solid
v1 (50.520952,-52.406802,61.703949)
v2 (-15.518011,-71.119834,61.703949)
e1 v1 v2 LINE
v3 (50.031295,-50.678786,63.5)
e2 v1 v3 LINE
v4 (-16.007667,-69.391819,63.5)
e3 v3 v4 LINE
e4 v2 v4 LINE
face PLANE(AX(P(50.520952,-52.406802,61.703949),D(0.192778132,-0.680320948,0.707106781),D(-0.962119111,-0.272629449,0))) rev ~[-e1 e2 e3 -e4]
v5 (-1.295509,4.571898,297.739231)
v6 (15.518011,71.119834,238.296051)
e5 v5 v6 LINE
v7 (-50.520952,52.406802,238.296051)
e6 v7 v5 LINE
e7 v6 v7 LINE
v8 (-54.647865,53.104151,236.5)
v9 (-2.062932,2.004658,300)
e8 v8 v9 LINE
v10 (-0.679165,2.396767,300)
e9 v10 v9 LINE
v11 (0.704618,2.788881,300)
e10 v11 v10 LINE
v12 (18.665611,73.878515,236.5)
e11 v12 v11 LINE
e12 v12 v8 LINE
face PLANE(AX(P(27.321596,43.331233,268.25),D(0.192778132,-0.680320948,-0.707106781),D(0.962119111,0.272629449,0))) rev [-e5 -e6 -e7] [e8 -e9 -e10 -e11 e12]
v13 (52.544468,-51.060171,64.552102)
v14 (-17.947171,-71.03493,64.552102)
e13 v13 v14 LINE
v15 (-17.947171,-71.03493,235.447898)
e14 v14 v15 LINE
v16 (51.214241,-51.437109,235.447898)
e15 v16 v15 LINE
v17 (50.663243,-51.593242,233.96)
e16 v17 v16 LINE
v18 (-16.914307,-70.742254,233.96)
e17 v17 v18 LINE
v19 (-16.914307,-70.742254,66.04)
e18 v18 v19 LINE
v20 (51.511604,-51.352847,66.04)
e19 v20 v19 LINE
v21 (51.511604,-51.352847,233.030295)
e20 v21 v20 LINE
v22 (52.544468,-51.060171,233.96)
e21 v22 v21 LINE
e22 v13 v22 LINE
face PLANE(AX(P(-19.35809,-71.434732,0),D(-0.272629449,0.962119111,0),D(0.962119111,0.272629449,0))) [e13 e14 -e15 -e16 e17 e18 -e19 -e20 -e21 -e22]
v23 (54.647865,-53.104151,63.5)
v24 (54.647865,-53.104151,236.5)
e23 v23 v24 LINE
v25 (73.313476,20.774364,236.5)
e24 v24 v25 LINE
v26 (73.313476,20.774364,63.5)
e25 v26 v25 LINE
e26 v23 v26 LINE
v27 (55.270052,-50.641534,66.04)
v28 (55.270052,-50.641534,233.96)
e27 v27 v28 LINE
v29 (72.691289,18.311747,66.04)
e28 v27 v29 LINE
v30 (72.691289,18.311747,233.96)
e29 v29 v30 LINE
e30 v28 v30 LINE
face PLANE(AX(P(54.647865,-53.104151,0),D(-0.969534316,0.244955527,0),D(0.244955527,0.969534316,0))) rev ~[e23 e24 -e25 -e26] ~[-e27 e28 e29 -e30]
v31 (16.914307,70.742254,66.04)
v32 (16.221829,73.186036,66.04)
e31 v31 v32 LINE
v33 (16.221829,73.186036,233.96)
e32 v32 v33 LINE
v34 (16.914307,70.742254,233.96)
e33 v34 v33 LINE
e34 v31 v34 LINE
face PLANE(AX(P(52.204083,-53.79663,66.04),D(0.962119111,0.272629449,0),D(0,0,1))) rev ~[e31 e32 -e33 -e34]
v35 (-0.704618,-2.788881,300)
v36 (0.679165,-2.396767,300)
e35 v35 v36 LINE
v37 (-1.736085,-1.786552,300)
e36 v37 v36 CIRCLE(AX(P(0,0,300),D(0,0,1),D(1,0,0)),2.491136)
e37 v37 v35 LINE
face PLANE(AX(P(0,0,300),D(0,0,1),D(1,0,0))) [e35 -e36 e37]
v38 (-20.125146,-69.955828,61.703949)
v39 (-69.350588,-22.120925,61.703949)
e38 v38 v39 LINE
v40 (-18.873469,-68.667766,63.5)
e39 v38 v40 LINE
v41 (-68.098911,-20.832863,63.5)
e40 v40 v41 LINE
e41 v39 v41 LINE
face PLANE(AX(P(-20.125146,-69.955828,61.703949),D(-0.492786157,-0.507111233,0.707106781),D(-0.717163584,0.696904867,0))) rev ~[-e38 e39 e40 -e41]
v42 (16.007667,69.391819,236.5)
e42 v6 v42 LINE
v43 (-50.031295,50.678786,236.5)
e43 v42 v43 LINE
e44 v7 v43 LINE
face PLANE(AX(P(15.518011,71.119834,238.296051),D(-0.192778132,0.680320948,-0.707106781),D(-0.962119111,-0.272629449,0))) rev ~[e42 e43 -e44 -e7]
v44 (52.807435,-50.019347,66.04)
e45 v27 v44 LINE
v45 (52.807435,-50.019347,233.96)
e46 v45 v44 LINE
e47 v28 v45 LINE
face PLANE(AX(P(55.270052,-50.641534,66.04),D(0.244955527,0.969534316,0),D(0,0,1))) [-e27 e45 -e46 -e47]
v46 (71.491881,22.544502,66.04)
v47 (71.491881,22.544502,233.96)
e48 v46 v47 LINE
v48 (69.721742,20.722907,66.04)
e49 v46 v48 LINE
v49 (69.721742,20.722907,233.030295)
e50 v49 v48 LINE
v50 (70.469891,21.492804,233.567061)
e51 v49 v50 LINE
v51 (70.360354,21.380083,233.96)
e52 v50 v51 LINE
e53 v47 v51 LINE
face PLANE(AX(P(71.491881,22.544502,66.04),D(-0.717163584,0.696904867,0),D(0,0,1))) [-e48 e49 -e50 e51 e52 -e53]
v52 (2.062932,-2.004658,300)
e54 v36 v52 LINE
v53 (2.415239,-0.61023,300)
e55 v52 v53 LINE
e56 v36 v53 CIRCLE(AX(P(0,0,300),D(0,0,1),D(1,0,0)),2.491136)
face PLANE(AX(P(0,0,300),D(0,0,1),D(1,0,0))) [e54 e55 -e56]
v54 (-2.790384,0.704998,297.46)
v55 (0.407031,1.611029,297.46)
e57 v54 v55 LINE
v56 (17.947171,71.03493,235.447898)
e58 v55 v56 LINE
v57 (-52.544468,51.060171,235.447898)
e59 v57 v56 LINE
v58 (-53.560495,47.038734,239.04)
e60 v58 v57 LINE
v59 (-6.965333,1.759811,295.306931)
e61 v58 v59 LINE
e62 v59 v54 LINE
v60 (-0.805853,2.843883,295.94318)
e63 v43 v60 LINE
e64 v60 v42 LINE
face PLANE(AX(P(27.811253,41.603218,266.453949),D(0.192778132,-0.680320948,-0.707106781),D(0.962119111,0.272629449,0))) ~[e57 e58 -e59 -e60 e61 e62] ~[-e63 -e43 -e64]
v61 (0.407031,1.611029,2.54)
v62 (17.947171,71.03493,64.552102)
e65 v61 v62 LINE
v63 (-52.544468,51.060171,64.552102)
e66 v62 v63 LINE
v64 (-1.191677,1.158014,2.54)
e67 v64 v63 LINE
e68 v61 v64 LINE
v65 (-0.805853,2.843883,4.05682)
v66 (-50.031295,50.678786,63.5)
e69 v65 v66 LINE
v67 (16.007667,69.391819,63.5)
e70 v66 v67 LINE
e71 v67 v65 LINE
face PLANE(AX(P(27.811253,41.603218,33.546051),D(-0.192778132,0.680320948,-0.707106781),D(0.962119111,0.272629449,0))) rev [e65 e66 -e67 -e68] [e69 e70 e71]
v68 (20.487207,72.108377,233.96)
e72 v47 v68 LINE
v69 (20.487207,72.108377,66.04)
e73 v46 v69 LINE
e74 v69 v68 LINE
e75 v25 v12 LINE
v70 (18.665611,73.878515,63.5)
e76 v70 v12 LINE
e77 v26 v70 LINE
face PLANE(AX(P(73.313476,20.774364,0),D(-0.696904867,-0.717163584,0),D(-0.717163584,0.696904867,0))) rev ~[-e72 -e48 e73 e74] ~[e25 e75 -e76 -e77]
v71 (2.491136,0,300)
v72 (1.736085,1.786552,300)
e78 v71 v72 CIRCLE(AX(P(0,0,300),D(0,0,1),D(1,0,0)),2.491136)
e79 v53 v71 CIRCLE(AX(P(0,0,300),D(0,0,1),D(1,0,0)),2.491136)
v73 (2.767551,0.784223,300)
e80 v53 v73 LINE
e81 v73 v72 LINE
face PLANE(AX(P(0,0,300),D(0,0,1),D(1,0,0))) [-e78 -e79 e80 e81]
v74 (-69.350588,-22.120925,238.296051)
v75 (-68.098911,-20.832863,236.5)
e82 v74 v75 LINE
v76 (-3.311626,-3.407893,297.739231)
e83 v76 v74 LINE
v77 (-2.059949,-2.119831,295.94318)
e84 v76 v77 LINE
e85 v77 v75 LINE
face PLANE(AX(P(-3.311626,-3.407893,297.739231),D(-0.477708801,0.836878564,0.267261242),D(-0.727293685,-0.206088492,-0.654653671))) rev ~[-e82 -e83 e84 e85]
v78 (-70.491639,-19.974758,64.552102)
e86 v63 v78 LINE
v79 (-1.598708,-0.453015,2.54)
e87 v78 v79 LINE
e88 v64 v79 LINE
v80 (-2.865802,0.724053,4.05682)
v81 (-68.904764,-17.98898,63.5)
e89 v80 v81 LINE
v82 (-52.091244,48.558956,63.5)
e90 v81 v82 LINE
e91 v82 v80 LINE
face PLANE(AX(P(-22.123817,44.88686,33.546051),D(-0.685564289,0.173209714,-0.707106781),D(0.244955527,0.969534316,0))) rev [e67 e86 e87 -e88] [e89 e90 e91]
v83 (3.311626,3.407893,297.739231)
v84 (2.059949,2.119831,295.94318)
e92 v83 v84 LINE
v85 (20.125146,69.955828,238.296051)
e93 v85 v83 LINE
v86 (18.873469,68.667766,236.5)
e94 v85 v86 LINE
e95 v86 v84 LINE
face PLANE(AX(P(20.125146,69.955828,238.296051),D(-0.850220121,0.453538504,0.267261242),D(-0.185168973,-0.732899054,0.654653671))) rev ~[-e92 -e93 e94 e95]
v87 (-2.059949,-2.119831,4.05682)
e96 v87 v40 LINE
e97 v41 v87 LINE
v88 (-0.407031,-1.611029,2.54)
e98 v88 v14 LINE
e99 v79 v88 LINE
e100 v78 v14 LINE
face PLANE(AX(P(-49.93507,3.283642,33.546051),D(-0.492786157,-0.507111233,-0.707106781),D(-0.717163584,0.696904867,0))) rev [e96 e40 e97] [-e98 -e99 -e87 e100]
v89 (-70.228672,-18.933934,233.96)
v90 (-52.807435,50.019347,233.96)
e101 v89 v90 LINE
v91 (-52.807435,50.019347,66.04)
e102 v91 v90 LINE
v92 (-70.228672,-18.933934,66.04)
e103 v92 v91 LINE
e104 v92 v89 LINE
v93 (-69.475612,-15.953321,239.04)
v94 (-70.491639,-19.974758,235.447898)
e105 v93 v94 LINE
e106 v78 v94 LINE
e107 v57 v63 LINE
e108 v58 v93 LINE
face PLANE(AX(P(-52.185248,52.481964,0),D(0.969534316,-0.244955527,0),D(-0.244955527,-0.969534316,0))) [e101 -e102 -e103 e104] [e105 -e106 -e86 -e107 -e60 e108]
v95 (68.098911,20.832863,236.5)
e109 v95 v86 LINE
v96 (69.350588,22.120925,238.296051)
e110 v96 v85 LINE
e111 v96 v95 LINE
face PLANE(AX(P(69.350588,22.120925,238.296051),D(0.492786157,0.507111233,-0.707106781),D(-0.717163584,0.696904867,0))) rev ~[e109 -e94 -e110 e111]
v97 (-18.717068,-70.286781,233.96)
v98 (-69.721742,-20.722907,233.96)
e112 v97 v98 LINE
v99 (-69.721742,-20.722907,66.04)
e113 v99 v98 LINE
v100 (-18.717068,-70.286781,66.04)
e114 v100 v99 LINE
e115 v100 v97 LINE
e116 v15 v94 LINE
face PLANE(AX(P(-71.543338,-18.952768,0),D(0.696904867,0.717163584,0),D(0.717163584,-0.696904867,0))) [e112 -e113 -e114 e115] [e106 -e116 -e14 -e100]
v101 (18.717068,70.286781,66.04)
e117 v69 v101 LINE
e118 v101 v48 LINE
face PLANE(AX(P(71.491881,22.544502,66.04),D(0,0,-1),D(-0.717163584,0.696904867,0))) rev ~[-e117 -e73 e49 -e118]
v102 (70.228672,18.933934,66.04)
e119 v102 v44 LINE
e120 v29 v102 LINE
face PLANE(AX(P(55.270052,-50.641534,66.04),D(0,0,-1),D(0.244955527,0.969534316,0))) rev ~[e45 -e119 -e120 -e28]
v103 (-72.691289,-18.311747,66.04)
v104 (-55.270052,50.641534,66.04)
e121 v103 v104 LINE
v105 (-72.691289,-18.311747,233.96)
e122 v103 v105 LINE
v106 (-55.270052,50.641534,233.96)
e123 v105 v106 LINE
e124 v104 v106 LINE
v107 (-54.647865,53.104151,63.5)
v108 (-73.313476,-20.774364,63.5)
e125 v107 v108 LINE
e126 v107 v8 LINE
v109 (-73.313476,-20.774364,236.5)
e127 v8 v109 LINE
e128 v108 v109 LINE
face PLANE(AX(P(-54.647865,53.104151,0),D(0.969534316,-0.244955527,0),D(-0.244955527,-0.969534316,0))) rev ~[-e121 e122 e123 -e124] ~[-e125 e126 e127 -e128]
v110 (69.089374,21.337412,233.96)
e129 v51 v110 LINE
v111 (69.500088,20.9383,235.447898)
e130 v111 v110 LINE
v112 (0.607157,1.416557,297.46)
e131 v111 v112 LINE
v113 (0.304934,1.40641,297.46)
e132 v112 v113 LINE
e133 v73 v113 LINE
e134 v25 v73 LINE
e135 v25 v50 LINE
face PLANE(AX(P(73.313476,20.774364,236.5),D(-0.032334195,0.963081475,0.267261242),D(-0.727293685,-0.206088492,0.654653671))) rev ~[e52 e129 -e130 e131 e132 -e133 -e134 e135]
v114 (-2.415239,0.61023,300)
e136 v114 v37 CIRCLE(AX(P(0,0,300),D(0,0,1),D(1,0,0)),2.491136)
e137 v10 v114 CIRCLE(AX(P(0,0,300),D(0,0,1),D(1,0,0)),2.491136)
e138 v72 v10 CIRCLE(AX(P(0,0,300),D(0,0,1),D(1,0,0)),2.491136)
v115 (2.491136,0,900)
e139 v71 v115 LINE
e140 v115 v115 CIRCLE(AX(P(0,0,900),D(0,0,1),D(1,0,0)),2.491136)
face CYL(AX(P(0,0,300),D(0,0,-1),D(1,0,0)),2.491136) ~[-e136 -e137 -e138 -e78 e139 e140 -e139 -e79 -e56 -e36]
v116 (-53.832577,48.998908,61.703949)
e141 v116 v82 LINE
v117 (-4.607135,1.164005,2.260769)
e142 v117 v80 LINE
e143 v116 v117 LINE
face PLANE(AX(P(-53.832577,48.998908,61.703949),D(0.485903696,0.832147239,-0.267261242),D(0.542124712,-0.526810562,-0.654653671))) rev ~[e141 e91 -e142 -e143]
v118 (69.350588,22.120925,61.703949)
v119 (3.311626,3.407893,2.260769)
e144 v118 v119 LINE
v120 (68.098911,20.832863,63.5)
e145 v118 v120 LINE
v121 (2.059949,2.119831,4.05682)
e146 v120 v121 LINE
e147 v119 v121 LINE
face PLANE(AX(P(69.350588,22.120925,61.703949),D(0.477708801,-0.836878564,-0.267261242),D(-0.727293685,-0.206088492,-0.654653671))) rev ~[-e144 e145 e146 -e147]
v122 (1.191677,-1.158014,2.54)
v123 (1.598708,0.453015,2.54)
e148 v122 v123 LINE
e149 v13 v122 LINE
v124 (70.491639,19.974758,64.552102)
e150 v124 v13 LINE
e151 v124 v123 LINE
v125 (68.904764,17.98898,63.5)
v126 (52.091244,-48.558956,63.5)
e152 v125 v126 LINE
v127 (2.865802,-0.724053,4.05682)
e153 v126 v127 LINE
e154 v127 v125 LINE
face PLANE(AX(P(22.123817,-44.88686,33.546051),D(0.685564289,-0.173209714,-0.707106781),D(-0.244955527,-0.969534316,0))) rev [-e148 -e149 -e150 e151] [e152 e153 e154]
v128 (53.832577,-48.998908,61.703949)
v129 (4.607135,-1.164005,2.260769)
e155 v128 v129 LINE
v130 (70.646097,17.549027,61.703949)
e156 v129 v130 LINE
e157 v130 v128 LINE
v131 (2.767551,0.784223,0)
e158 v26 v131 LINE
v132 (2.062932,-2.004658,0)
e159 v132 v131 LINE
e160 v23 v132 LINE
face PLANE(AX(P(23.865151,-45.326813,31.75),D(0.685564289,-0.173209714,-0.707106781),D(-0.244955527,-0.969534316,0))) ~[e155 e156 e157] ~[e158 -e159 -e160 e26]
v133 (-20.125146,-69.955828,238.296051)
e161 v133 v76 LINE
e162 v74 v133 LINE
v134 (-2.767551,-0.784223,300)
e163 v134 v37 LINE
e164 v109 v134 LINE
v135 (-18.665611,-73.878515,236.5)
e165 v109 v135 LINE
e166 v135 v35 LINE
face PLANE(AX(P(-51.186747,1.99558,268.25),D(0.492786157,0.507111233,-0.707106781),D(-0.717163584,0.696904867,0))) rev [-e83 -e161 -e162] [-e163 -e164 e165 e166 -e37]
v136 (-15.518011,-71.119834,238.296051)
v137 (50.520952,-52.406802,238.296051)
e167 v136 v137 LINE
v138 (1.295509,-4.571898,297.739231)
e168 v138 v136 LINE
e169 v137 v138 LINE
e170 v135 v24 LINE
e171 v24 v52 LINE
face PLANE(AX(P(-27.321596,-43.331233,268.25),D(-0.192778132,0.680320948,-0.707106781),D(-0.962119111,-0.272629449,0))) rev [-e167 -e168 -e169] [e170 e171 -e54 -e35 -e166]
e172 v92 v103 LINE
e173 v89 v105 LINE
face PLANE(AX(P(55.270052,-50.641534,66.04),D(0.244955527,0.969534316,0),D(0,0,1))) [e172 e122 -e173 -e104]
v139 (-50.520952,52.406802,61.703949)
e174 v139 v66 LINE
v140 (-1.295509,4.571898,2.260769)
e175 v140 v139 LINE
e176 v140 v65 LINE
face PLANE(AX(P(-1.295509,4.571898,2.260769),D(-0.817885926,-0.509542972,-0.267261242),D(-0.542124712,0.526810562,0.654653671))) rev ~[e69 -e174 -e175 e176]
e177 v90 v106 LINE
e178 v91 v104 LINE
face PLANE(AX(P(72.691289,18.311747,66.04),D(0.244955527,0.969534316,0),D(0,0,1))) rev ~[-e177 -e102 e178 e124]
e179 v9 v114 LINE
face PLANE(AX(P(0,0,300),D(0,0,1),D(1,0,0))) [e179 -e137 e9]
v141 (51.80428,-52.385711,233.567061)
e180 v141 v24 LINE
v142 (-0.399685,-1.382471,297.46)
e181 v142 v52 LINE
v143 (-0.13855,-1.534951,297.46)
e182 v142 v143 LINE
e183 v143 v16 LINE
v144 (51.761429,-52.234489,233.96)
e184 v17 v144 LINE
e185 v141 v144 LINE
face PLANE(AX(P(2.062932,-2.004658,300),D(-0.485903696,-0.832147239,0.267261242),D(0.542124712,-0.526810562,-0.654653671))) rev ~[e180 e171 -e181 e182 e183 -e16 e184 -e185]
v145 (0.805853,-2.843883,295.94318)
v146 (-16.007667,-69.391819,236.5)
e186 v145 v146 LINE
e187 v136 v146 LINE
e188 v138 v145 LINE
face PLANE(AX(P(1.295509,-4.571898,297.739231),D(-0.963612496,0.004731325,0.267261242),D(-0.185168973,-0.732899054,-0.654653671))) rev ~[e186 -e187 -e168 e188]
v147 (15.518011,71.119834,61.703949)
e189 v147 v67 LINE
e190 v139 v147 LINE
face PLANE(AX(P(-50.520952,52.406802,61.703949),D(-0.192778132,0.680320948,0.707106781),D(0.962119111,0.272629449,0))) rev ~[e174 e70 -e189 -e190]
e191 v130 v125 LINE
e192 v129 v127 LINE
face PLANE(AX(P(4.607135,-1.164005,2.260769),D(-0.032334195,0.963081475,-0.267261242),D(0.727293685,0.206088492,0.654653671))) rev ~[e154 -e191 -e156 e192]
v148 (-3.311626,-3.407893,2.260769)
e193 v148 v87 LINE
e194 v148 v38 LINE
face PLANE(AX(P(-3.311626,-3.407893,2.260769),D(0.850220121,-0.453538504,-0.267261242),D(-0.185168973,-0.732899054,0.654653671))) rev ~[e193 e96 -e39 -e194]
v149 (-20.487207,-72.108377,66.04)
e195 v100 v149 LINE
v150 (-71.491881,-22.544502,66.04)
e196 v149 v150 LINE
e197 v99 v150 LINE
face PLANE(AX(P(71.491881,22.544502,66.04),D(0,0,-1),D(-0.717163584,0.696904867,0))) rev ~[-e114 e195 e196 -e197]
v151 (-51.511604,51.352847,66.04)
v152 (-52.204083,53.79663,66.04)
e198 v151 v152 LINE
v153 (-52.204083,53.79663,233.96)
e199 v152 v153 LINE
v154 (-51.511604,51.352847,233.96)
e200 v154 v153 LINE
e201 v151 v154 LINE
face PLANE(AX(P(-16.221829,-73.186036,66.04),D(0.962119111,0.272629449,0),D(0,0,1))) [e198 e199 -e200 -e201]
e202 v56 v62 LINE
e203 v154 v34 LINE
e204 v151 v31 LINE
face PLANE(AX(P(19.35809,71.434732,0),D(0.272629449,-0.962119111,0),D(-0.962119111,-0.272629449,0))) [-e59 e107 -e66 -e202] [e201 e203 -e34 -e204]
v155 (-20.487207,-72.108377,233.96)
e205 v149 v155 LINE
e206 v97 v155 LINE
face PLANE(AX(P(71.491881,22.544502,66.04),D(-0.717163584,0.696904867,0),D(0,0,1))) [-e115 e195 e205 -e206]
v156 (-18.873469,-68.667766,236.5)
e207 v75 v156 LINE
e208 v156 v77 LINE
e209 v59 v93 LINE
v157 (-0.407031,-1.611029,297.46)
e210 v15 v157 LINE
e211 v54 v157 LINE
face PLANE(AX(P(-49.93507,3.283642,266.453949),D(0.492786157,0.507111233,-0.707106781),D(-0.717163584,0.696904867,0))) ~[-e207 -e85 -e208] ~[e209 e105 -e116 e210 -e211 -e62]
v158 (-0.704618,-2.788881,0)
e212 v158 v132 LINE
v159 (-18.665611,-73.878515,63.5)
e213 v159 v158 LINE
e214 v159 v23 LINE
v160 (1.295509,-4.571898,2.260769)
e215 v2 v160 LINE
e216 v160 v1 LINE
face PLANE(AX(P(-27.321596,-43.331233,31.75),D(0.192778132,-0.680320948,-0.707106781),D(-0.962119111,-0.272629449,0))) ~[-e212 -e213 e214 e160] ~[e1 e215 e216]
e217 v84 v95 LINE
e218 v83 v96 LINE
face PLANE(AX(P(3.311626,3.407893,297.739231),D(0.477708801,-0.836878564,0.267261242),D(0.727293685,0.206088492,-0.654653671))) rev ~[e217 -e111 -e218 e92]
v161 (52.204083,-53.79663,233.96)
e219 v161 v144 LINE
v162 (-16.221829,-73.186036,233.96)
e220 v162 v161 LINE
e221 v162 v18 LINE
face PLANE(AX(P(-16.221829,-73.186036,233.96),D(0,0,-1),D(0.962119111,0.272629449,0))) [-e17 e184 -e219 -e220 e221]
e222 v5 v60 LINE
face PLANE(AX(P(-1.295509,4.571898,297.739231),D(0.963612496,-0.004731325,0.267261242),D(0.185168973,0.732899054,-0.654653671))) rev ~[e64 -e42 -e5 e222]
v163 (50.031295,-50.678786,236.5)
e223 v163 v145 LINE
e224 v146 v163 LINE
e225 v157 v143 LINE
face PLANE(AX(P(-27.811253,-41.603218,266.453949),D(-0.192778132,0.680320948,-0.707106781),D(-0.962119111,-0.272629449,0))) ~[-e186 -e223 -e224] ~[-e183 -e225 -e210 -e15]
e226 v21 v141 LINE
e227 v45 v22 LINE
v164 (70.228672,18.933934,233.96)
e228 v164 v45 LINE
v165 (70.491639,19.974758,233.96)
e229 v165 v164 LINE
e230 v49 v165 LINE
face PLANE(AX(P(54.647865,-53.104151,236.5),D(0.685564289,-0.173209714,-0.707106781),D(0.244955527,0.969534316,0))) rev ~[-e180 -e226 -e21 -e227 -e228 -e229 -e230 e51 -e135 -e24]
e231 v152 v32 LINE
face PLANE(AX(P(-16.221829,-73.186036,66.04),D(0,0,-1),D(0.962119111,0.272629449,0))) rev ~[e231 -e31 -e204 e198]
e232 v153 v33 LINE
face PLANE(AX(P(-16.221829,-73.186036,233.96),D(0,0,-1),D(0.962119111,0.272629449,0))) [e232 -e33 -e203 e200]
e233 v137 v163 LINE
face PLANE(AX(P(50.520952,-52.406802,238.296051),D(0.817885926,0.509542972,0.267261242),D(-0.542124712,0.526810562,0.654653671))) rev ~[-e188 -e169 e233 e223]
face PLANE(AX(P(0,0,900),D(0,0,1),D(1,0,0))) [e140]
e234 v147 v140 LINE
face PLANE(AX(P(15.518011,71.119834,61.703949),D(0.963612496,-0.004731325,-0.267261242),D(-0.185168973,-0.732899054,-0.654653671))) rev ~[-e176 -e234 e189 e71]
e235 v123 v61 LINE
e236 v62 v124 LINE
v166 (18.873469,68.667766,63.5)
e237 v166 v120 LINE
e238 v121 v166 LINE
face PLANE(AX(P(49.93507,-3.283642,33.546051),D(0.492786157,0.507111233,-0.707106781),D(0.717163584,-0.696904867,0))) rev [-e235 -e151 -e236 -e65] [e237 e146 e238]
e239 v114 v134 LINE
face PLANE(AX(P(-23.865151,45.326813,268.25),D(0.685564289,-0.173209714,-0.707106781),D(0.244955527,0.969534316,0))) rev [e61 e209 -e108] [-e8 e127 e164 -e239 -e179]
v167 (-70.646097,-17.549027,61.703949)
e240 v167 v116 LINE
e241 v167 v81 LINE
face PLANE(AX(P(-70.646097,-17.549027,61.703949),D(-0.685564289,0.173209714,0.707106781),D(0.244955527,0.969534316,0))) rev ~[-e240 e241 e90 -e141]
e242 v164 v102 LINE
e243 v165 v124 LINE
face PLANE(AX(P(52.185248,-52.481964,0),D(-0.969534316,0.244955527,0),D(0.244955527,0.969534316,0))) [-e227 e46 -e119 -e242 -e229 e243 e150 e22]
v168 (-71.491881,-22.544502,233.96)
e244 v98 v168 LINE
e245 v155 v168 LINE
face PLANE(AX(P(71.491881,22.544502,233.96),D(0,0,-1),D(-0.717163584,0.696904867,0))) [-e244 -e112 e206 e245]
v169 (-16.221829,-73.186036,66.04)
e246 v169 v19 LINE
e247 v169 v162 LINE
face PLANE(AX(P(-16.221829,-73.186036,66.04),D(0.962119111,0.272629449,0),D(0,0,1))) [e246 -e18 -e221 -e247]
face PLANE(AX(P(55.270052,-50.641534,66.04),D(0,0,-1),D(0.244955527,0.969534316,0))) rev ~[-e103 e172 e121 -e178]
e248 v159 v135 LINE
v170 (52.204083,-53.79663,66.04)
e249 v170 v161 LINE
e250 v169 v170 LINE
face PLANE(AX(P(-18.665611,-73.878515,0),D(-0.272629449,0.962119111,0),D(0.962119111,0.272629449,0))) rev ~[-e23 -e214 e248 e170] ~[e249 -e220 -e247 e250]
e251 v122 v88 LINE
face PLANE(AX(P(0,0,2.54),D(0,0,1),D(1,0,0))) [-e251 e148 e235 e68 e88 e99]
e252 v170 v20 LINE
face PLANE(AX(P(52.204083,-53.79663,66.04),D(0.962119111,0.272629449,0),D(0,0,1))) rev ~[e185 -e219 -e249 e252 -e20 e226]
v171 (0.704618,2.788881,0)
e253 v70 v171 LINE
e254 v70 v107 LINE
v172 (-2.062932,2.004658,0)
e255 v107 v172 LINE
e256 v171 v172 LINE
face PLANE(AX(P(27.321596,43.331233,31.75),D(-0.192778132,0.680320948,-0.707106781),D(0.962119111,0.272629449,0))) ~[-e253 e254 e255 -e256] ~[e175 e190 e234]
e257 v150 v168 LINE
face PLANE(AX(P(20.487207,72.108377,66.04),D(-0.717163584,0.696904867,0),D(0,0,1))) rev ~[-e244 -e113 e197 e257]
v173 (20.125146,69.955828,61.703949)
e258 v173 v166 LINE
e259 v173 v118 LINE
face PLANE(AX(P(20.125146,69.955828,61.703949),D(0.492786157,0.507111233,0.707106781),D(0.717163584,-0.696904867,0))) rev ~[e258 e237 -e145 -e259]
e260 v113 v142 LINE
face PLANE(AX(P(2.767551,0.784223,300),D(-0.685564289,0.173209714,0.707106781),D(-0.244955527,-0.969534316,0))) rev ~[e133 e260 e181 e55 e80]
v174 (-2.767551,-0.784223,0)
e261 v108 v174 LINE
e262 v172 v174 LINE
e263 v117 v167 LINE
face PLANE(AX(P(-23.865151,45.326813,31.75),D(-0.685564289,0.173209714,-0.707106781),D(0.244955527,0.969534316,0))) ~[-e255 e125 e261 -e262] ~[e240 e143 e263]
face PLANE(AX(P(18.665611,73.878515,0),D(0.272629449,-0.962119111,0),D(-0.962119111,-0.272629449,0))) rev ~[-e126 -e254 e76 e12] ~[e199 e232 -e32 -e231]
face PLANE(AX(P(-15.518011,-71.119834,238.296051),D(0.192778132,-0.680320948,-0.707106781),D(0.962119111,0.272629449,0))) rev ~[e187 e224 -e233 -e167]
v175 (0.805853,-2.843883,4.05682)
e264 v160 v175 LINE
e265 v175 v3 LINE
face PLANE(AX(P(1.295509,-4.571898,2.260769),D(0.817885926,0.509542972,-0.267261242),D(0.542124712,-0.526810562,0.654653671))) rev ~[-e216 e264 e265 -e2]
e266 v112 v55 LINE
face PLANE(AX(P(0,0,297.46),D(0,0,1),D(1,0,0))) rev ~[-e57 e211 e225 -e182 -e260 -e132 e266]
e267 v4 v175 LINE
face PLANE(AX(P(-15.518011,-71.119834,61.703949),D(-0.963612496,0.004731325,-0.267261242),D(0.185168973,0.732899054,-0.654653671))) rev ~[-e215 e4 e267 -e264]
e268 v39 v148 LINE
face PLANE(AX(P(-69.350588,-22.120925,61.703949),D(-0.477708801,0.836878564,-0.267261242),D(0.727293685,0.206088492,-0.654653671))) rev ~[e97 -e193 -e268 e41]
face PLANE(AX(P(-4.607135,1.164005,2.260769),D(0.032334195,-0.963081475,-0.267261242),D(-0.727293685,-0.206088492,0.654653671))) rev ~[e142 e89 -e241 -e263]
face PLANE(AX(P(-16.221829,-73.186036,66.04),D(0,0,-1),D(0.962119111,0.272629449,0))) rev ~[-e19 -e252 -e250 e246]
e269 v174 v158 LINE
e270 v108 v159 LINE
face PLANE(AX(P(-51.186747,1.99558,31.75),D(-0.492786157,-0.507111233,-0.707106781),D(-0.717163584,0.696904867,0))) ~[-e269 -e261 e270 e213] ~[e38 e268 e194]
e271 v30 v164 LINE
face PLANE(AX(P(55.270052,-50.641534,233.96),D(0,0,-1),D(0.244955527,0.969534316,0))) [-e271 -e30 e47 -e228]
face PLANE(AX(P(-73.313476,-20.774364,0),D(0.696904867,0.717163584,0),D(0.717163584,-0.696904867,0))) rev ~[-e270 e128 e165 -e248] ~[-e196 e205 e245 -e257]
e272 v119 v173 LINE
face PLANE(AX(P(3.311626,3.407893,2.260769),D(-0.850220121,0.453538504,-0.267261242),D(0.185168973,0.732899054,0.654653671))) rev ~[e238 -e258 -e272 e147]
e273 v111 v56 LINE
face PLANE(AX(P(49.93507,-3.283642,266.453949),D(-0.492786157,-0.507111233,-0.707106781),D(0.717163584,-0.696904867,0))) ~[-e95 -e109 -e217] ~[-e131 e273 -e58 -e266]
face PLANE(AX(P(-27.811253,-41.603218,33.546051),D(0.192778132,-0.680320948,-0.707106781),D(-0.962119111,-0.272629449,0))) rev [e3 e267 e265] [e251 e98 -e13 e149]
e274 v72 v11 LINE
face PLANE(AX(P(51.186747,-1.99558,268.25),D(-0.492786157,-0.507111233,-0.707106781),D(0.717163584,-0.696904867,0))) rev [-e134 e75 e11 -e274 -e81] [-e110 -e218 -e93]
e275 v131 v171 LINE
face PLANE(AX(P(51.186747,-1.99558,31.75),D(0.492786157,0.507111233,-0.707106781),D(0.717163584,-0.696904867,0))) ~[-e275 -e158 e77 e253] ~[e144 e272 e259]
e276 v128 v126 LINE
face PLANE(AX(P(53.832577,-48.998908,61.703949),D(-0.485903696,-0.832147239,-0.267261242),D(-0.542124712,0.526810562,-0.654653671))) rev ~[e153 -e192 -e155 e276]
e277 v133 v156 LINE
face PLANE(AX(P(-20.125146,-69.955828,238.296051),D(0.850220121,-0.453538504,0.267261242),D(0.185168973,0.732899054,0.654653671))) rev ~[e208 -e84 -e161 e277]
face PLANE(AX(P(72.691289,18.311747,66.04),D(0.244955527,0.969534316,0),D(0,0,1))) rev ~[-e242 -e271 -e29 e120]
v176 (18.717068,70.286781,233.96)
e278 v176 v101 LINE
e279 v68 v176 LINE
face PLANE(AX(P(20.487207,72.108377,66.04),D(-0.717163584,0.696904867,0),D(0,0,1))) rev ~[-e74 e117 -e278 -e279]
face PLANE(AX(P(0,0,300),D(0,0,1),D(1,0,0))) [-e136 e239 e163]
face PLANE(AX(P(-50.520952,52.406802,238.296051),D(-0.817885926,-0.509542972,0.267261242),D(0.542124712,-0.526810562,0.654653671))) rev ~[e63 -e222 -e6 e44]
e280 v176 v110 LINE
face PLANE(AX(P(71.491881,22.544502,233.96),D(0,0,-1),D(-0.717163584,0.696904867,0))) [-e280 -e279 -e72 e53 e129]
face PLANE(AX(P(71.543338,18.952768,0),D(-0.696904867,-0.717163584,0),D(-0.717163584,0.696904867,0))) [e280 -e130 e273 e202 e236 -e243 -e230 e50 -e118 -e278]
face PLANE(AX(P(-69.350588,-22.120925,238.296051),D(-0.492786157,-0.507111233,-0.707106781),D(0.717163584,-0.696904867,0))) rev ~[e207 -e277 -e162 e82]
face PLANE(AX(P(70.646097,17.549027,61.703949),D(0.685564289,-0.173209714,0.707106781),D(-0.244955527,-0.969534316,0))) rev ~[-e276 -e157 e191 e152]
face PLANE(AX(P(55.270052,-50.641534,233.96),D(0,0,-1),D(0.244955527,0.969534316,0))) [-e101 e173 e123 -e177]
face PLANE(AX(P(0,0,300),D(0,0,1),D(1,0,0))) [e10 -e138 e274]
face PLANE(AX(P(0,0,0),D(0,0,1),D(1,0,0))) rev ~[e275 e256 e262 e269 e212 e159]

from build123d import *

# Parameters (mm, degrees)
F1_DEPTH  = 300
F2_SIZE   = 63.5
F3_T      = -2.54
F5_DEPTH  = 2.54
F7_DEPTH  = 2.54
F9_DEPTH  = 7.1852048969
F10_DEPTH = 2.541
F12_DEPTH = 2.54
F14_DEPTH = 2.54
F15_W     = 71.12
F15_H     = 167.92
F16_DEPTH = 157.0594794416
F17_W     = 71.12
F17_H     = 167.92
F18_DEPTH = 155.1690173594
F19_W     = 71.12
F19_H     = 167.92
F20_DEPTH = 170.067634702
F22_DEPTH = 2.54
F24_DEPTH = 2.54
F26_DEPTH = 2.54
F28_DEPTH = 2.54
F30_DEPTH = 2.54
F32_DEPTH = 2.54
F33_R     = 2.4911357684
F34_DEPTH = 600


# Not quite as in the source:
# - a feature names something its author has since deleted; it is built from what else it names


with BuildPart() as f1:
    # F0 (on Top) → F1 (new body)
    with BuildSketch(Plane.XY):
        Polygon((73.3134762531, 20.774364002), (18.6656111534, 73.8785148759), (-54.6478650997, 53.104150874), (-73.3134762531, -20.774364002), (-18.6656111534, -73.8785148759), (54.6478650997, -53.104150874), align=None)
    extrude(amount=F1_DEPTH)

    # F2
    f2_edges = [f1.edges().sort_by_distance(p)[0] for p in [
        (45.989544, 47.326439, 300),
        (-17.991127, 63.491333, 300),
        (-63.980671, 16.164893, 300),
        (-45.989544, -47.326439, 300),
        (17.991127, -63.491333, 300),
        (63.980671, -16.164893, 300),
        (45.989544, 47.326439, 0),
        (-17.991127, 63.491333, 0),
        (-63.980671, 16.164893, 0),
        (-45.989544, -47.326439, 0),
        (17.991127, -63.491333, 0),
        (63.980671, -16.164893, 0),
    ]]
    chamfer(f2_edges, length=F2_SIZE)

    # F3
    f3_openings = [f1.faces().sort_by_distance(p)[0] for p in [
        (-42.712352, 10.791394, 258.436633),
    ]]
    offset(amount=F3_T, openings=f3_openings)

    # F4 (on face) → F5 (cut, through all)
    with BuildSketch(Plane(origin=(-105.4037723876, -108.4678135258, 151.2455678842), x_dir=(0.8701504485, -0.287188723, 0.4004507889), z_dir=(-0.4927861574, -0.5071112335, 0.7071067812))):
        Polygon((41.4332766293, 120.899493065), (98.0044622716, 82.0276124879), (117.3270058287, 170.7488222605), align=None)
    extrude(amount=-F5_DEPTH, mode=Mode.SUBTRACT)

    # F6 (on face) → F7 (cut, through all)
    with BuildSketch(Plane(origin=(41.2339958125, -145.5162513053, 151.2455678842), x_dir=(0.9812423716, 0.1336581106, -0.1389205444), z_dir=(0.192778132, -0.6803209476, 0.7071067812))):
        Polygon((-57.8368894269, 113.966214542), (9.4644872932, 127.4512742811), (-40.7019588227, 203.1357603871), align=None)
    extrude(amount=-F7_DEPTH, mode=Mode.SUBTRACT)

    # F8 (on face) → F9 (cut, through all)
    with BuildSketch(Plane(origin=(146.6377682001, -37.0484377795, 151.2455678842), x_dir=(0.7280120913, 0.1631104703, -0.6658778937), z_dir=(0.6855642894, -0.1732097142, 0.7071067812))):
        Polygon((-197.6206426806, 72.1381474707), (-198.5885090871, 69.4293510884), (-126.3576583393, 4.6891971376), (-100.7185084182, 76.4462455114), align=None)
        Polygon((-127.4775404122, 9.1038742336), (-195.0937835337, 69.7079782132), (-104.3824295702, 73.7408450768), align=None, mode=Mode.SUBTRACT)
    extrude(amount=-F9_DEPTH, mode=Mode.SUBTRACT)

    # F8 (on face) + F2_face2 (on face) → F10 (cut, through all)
    with BuildSketch(Plane(origin=(146.6377682001, -37.0484377795, 151.2455678842), x_dir=(0.7280120913, 0.1631104703, -0.6658778937), z_dir=(0.6855642894, -0.1732097142, 0.7071067812))):
        Polygon((-197.6206426806, 72.1381474707), (-198.5885090871, 69.4293510884), (-126.3576583393, 4.6891971376), (-100.7185084182, 76.4462455114), align=None)
        Polygon((-127.4775404122, 9.1038742336), (-195.0937835337, 69.7079782132), (-104.3824295702, 73.7408450768), align=None, mode=Mode.SUBTRACT)
    with BuildSketch(Plane(origin=(42.71235225, -10.7913939511, 258.436632955), x_dir=(0.2449555269, 0.969534316, 0), z_dir=(0.6855642894, -0.1732097142, 0.7071067812))):
        Polygon((0, 55.5822670322), (-34.3195357799, -28.4830838377), (34.3195357799, -28.4830838377), align=None)
    extrude(amount=-F10_DEPTH, mode=Mode.SUBTRACT)

    # F11 (on face) → F12 (cut, through all)
    with BuildSketch(Plane(origin=(105.4037723876, 108.4678135258, 151.2455678842), x_dir=(0.8701504485, -0.287188723, -0.4004507889), z_dir=(0.4927861574, 0.5071112335, 0.7071067812))):
        Polygon((-98.0044622716, -82.0276124879), (-117.3270058287, -170.7488222605), (-41.4332766293, -120.899493065), align=None)
    extrude(amount=-F12_DEPTH, mode=Mode.SUBTRACT)

    # F13 (on face) → F14 (cut, through all)
    with BuildSketch(Plane(origin=(-41.2339958125, 145.5162513053, 151.2455678842), x_dir=(0.9812423716, 0.1336581106, 0.1389205444), z_dir=(-0.192778132, 0.6803209476, 0.7071067812))):
        Polygon((57.8368894269, -113.966214542), (-9.4644872932, -127.4512742811), (40.7019588227, -203.1357603871), align=None)
    extrude(amount=-F14_DEPTH, mode=Mode.SUBTRACT)

    # F15 (on face) → F16 (cut, through all)
    with BuildSketch(Plane(origin=(17.9911269732, -63.4913328749, 0), x_dir=(0.9621191109, 0.2726294488, 0), z_dir=(0.2726294488, -0.9621191109, 0))):
        with Locations((0, 150)):
            Rectangle(F15_W, F15_H)
    extrude(amount=-F16_DEPTH, mode=Mode.SUBTRACT)

    # F17 (on face) → F18 (cut, through all)
    with BuildSketch(Plane(origin=(63.9806706764, -16.164893436, 0), x_dir=(0.2449555269, 0.969534316, 0), z_dir=(0.969534316, -0.2449555269, 0))):
        with Locations((0, 150)):
            Rectangle(F17_W, F17_H)
    extrude(amount=-F18_DEPTH, mode=Mode.SUBTRACT)

    # F19 (on face) → F20 (cut, through all)
    with BuildSketch(Plane(origin=(45.9895437032, 47.3264394389, 0), x_dir=(-0.717163584, 0.6969048671, 0), z_dir=(0.6969048671, 0.717163584, 0))):
        with Locations((0, 150)):
            Rectangle(F19_W, F19_H)
    extrude(amount=-F20_DEPTH, mode=Mode.SUBTRACT)

    # F21 (on face) → F22 (cut, through all)
    with BuildSketch(Plane(origin=(1.2076208066, -0.3051087374, -1.2455678842), x_dir=(0.7280120913, 0.1631104703, 0.6658778937), z_dir=(0.6855642894, -0.1732097142, -0.7071067812))):
        Polygon((95.3809385521, -2.3644010884), (72.2858277101, 62.2725697547), (4.6695845886, 1.6684657751), align=None)
    extrude(amount=-F22_DEPTH, mode=Mode.SUBTRACT)

    # F23 (on face) → F24 (cut, through all)
    with BuildSketch(Plane(origin=(0.8680423208, 0.8932759279, -1.2455678842), x_dir=(0.8701504485, -0.287188723, 0.4004507889), z_dir=(0.4927861574, 0.5071112335, -0.7071067812))):
        Polygon((22.13077439, -92.8080958564), (78.7019600324, -53.9362152793), (2.808230833, -4.0868860838), align=None)
    extrude(amount=-F24_DEPTH, mode=Mode.SUBTRACT)

    # F25 (on face) → F26 (cut, through all)
    with BuildSketch(Plane(origin=(-0.3395784858, 1.1983846653, -1.2455678842), x_dir=(0.9812423716, 0.1336581106, -0.1389205444), z_dir=(-0.192778132, 0.6803209476, -0.7071067812))):
        Polygon((16.1607261154, -94.0316157631), (-0.9742044888, -4.862069918), (-51.1406506047, -80.546556024), align=None)
    extrude(amount=-F26_DEPTH, mode=Mode.SUBTRACT)

    # F27 (on face) → F28 (cut, through all)
    with BuildSketch(Plane(origin=(-1.2076208066, 0.3051087374, -1.2455678842), x_dir=(0.7280120913, 0.1631104703, -0.6658778937), z_dir=(-0.6855642894, 0.1732097142, -0.7071067812))):
        Polygon((-72.2858277101, -62.2725697547), (-4.6695845886, -1.6684657751), (-95.3809385521, 2.3644010884), align=None)
    extrude(amount=-F28_DEPTH, mode=Mode.SUBTRACT)

    # F29 (on face) → F30 (cut, through all)
    with BuildSketch(Plane(origin=(-0.8680423208, -0.8932759279, -1.2455678842), x_dir=(0.8701504485, -0.287188723, -0.4004507889), z_dir=(-0.4927861574, -0.5071112335, -0.7071067812))):
        Polygon((-78.7019600324, 53.9362152793), (-2.808230833, 4.0868860838), (-22.13077439, 92.8080958564), align=None)
    extrude(amount=-F30_DEPTH, mode=Mode.SUBTRACT)

    # F31 (on face) → F32 (cut, through all)
    with BuildSketch(Plane(origin=(0.3395784858, -1.1983846653, -1.2455678842), x_dir=(0.9812423716, 0.1336581106, 0.1389205444), z_dir=(0.192778132, -0.6803209476, -0.7071067812))):
        Polygon((-16.1607261154, 94.0316157631), (0.9742044888, 4.862069918), (51.1406506047, 80.546556024), align=None)
    extrude(amount=-F32_DEPTH, mode=Mode.SUBTRACT)

    # F33 (on face) → F34 (join)
    with BuildSketch(Plane.XY.offset(300)):
        Circle(F33_R)
    extrude(amount=F34_DEPTH)


solid = f1.part
